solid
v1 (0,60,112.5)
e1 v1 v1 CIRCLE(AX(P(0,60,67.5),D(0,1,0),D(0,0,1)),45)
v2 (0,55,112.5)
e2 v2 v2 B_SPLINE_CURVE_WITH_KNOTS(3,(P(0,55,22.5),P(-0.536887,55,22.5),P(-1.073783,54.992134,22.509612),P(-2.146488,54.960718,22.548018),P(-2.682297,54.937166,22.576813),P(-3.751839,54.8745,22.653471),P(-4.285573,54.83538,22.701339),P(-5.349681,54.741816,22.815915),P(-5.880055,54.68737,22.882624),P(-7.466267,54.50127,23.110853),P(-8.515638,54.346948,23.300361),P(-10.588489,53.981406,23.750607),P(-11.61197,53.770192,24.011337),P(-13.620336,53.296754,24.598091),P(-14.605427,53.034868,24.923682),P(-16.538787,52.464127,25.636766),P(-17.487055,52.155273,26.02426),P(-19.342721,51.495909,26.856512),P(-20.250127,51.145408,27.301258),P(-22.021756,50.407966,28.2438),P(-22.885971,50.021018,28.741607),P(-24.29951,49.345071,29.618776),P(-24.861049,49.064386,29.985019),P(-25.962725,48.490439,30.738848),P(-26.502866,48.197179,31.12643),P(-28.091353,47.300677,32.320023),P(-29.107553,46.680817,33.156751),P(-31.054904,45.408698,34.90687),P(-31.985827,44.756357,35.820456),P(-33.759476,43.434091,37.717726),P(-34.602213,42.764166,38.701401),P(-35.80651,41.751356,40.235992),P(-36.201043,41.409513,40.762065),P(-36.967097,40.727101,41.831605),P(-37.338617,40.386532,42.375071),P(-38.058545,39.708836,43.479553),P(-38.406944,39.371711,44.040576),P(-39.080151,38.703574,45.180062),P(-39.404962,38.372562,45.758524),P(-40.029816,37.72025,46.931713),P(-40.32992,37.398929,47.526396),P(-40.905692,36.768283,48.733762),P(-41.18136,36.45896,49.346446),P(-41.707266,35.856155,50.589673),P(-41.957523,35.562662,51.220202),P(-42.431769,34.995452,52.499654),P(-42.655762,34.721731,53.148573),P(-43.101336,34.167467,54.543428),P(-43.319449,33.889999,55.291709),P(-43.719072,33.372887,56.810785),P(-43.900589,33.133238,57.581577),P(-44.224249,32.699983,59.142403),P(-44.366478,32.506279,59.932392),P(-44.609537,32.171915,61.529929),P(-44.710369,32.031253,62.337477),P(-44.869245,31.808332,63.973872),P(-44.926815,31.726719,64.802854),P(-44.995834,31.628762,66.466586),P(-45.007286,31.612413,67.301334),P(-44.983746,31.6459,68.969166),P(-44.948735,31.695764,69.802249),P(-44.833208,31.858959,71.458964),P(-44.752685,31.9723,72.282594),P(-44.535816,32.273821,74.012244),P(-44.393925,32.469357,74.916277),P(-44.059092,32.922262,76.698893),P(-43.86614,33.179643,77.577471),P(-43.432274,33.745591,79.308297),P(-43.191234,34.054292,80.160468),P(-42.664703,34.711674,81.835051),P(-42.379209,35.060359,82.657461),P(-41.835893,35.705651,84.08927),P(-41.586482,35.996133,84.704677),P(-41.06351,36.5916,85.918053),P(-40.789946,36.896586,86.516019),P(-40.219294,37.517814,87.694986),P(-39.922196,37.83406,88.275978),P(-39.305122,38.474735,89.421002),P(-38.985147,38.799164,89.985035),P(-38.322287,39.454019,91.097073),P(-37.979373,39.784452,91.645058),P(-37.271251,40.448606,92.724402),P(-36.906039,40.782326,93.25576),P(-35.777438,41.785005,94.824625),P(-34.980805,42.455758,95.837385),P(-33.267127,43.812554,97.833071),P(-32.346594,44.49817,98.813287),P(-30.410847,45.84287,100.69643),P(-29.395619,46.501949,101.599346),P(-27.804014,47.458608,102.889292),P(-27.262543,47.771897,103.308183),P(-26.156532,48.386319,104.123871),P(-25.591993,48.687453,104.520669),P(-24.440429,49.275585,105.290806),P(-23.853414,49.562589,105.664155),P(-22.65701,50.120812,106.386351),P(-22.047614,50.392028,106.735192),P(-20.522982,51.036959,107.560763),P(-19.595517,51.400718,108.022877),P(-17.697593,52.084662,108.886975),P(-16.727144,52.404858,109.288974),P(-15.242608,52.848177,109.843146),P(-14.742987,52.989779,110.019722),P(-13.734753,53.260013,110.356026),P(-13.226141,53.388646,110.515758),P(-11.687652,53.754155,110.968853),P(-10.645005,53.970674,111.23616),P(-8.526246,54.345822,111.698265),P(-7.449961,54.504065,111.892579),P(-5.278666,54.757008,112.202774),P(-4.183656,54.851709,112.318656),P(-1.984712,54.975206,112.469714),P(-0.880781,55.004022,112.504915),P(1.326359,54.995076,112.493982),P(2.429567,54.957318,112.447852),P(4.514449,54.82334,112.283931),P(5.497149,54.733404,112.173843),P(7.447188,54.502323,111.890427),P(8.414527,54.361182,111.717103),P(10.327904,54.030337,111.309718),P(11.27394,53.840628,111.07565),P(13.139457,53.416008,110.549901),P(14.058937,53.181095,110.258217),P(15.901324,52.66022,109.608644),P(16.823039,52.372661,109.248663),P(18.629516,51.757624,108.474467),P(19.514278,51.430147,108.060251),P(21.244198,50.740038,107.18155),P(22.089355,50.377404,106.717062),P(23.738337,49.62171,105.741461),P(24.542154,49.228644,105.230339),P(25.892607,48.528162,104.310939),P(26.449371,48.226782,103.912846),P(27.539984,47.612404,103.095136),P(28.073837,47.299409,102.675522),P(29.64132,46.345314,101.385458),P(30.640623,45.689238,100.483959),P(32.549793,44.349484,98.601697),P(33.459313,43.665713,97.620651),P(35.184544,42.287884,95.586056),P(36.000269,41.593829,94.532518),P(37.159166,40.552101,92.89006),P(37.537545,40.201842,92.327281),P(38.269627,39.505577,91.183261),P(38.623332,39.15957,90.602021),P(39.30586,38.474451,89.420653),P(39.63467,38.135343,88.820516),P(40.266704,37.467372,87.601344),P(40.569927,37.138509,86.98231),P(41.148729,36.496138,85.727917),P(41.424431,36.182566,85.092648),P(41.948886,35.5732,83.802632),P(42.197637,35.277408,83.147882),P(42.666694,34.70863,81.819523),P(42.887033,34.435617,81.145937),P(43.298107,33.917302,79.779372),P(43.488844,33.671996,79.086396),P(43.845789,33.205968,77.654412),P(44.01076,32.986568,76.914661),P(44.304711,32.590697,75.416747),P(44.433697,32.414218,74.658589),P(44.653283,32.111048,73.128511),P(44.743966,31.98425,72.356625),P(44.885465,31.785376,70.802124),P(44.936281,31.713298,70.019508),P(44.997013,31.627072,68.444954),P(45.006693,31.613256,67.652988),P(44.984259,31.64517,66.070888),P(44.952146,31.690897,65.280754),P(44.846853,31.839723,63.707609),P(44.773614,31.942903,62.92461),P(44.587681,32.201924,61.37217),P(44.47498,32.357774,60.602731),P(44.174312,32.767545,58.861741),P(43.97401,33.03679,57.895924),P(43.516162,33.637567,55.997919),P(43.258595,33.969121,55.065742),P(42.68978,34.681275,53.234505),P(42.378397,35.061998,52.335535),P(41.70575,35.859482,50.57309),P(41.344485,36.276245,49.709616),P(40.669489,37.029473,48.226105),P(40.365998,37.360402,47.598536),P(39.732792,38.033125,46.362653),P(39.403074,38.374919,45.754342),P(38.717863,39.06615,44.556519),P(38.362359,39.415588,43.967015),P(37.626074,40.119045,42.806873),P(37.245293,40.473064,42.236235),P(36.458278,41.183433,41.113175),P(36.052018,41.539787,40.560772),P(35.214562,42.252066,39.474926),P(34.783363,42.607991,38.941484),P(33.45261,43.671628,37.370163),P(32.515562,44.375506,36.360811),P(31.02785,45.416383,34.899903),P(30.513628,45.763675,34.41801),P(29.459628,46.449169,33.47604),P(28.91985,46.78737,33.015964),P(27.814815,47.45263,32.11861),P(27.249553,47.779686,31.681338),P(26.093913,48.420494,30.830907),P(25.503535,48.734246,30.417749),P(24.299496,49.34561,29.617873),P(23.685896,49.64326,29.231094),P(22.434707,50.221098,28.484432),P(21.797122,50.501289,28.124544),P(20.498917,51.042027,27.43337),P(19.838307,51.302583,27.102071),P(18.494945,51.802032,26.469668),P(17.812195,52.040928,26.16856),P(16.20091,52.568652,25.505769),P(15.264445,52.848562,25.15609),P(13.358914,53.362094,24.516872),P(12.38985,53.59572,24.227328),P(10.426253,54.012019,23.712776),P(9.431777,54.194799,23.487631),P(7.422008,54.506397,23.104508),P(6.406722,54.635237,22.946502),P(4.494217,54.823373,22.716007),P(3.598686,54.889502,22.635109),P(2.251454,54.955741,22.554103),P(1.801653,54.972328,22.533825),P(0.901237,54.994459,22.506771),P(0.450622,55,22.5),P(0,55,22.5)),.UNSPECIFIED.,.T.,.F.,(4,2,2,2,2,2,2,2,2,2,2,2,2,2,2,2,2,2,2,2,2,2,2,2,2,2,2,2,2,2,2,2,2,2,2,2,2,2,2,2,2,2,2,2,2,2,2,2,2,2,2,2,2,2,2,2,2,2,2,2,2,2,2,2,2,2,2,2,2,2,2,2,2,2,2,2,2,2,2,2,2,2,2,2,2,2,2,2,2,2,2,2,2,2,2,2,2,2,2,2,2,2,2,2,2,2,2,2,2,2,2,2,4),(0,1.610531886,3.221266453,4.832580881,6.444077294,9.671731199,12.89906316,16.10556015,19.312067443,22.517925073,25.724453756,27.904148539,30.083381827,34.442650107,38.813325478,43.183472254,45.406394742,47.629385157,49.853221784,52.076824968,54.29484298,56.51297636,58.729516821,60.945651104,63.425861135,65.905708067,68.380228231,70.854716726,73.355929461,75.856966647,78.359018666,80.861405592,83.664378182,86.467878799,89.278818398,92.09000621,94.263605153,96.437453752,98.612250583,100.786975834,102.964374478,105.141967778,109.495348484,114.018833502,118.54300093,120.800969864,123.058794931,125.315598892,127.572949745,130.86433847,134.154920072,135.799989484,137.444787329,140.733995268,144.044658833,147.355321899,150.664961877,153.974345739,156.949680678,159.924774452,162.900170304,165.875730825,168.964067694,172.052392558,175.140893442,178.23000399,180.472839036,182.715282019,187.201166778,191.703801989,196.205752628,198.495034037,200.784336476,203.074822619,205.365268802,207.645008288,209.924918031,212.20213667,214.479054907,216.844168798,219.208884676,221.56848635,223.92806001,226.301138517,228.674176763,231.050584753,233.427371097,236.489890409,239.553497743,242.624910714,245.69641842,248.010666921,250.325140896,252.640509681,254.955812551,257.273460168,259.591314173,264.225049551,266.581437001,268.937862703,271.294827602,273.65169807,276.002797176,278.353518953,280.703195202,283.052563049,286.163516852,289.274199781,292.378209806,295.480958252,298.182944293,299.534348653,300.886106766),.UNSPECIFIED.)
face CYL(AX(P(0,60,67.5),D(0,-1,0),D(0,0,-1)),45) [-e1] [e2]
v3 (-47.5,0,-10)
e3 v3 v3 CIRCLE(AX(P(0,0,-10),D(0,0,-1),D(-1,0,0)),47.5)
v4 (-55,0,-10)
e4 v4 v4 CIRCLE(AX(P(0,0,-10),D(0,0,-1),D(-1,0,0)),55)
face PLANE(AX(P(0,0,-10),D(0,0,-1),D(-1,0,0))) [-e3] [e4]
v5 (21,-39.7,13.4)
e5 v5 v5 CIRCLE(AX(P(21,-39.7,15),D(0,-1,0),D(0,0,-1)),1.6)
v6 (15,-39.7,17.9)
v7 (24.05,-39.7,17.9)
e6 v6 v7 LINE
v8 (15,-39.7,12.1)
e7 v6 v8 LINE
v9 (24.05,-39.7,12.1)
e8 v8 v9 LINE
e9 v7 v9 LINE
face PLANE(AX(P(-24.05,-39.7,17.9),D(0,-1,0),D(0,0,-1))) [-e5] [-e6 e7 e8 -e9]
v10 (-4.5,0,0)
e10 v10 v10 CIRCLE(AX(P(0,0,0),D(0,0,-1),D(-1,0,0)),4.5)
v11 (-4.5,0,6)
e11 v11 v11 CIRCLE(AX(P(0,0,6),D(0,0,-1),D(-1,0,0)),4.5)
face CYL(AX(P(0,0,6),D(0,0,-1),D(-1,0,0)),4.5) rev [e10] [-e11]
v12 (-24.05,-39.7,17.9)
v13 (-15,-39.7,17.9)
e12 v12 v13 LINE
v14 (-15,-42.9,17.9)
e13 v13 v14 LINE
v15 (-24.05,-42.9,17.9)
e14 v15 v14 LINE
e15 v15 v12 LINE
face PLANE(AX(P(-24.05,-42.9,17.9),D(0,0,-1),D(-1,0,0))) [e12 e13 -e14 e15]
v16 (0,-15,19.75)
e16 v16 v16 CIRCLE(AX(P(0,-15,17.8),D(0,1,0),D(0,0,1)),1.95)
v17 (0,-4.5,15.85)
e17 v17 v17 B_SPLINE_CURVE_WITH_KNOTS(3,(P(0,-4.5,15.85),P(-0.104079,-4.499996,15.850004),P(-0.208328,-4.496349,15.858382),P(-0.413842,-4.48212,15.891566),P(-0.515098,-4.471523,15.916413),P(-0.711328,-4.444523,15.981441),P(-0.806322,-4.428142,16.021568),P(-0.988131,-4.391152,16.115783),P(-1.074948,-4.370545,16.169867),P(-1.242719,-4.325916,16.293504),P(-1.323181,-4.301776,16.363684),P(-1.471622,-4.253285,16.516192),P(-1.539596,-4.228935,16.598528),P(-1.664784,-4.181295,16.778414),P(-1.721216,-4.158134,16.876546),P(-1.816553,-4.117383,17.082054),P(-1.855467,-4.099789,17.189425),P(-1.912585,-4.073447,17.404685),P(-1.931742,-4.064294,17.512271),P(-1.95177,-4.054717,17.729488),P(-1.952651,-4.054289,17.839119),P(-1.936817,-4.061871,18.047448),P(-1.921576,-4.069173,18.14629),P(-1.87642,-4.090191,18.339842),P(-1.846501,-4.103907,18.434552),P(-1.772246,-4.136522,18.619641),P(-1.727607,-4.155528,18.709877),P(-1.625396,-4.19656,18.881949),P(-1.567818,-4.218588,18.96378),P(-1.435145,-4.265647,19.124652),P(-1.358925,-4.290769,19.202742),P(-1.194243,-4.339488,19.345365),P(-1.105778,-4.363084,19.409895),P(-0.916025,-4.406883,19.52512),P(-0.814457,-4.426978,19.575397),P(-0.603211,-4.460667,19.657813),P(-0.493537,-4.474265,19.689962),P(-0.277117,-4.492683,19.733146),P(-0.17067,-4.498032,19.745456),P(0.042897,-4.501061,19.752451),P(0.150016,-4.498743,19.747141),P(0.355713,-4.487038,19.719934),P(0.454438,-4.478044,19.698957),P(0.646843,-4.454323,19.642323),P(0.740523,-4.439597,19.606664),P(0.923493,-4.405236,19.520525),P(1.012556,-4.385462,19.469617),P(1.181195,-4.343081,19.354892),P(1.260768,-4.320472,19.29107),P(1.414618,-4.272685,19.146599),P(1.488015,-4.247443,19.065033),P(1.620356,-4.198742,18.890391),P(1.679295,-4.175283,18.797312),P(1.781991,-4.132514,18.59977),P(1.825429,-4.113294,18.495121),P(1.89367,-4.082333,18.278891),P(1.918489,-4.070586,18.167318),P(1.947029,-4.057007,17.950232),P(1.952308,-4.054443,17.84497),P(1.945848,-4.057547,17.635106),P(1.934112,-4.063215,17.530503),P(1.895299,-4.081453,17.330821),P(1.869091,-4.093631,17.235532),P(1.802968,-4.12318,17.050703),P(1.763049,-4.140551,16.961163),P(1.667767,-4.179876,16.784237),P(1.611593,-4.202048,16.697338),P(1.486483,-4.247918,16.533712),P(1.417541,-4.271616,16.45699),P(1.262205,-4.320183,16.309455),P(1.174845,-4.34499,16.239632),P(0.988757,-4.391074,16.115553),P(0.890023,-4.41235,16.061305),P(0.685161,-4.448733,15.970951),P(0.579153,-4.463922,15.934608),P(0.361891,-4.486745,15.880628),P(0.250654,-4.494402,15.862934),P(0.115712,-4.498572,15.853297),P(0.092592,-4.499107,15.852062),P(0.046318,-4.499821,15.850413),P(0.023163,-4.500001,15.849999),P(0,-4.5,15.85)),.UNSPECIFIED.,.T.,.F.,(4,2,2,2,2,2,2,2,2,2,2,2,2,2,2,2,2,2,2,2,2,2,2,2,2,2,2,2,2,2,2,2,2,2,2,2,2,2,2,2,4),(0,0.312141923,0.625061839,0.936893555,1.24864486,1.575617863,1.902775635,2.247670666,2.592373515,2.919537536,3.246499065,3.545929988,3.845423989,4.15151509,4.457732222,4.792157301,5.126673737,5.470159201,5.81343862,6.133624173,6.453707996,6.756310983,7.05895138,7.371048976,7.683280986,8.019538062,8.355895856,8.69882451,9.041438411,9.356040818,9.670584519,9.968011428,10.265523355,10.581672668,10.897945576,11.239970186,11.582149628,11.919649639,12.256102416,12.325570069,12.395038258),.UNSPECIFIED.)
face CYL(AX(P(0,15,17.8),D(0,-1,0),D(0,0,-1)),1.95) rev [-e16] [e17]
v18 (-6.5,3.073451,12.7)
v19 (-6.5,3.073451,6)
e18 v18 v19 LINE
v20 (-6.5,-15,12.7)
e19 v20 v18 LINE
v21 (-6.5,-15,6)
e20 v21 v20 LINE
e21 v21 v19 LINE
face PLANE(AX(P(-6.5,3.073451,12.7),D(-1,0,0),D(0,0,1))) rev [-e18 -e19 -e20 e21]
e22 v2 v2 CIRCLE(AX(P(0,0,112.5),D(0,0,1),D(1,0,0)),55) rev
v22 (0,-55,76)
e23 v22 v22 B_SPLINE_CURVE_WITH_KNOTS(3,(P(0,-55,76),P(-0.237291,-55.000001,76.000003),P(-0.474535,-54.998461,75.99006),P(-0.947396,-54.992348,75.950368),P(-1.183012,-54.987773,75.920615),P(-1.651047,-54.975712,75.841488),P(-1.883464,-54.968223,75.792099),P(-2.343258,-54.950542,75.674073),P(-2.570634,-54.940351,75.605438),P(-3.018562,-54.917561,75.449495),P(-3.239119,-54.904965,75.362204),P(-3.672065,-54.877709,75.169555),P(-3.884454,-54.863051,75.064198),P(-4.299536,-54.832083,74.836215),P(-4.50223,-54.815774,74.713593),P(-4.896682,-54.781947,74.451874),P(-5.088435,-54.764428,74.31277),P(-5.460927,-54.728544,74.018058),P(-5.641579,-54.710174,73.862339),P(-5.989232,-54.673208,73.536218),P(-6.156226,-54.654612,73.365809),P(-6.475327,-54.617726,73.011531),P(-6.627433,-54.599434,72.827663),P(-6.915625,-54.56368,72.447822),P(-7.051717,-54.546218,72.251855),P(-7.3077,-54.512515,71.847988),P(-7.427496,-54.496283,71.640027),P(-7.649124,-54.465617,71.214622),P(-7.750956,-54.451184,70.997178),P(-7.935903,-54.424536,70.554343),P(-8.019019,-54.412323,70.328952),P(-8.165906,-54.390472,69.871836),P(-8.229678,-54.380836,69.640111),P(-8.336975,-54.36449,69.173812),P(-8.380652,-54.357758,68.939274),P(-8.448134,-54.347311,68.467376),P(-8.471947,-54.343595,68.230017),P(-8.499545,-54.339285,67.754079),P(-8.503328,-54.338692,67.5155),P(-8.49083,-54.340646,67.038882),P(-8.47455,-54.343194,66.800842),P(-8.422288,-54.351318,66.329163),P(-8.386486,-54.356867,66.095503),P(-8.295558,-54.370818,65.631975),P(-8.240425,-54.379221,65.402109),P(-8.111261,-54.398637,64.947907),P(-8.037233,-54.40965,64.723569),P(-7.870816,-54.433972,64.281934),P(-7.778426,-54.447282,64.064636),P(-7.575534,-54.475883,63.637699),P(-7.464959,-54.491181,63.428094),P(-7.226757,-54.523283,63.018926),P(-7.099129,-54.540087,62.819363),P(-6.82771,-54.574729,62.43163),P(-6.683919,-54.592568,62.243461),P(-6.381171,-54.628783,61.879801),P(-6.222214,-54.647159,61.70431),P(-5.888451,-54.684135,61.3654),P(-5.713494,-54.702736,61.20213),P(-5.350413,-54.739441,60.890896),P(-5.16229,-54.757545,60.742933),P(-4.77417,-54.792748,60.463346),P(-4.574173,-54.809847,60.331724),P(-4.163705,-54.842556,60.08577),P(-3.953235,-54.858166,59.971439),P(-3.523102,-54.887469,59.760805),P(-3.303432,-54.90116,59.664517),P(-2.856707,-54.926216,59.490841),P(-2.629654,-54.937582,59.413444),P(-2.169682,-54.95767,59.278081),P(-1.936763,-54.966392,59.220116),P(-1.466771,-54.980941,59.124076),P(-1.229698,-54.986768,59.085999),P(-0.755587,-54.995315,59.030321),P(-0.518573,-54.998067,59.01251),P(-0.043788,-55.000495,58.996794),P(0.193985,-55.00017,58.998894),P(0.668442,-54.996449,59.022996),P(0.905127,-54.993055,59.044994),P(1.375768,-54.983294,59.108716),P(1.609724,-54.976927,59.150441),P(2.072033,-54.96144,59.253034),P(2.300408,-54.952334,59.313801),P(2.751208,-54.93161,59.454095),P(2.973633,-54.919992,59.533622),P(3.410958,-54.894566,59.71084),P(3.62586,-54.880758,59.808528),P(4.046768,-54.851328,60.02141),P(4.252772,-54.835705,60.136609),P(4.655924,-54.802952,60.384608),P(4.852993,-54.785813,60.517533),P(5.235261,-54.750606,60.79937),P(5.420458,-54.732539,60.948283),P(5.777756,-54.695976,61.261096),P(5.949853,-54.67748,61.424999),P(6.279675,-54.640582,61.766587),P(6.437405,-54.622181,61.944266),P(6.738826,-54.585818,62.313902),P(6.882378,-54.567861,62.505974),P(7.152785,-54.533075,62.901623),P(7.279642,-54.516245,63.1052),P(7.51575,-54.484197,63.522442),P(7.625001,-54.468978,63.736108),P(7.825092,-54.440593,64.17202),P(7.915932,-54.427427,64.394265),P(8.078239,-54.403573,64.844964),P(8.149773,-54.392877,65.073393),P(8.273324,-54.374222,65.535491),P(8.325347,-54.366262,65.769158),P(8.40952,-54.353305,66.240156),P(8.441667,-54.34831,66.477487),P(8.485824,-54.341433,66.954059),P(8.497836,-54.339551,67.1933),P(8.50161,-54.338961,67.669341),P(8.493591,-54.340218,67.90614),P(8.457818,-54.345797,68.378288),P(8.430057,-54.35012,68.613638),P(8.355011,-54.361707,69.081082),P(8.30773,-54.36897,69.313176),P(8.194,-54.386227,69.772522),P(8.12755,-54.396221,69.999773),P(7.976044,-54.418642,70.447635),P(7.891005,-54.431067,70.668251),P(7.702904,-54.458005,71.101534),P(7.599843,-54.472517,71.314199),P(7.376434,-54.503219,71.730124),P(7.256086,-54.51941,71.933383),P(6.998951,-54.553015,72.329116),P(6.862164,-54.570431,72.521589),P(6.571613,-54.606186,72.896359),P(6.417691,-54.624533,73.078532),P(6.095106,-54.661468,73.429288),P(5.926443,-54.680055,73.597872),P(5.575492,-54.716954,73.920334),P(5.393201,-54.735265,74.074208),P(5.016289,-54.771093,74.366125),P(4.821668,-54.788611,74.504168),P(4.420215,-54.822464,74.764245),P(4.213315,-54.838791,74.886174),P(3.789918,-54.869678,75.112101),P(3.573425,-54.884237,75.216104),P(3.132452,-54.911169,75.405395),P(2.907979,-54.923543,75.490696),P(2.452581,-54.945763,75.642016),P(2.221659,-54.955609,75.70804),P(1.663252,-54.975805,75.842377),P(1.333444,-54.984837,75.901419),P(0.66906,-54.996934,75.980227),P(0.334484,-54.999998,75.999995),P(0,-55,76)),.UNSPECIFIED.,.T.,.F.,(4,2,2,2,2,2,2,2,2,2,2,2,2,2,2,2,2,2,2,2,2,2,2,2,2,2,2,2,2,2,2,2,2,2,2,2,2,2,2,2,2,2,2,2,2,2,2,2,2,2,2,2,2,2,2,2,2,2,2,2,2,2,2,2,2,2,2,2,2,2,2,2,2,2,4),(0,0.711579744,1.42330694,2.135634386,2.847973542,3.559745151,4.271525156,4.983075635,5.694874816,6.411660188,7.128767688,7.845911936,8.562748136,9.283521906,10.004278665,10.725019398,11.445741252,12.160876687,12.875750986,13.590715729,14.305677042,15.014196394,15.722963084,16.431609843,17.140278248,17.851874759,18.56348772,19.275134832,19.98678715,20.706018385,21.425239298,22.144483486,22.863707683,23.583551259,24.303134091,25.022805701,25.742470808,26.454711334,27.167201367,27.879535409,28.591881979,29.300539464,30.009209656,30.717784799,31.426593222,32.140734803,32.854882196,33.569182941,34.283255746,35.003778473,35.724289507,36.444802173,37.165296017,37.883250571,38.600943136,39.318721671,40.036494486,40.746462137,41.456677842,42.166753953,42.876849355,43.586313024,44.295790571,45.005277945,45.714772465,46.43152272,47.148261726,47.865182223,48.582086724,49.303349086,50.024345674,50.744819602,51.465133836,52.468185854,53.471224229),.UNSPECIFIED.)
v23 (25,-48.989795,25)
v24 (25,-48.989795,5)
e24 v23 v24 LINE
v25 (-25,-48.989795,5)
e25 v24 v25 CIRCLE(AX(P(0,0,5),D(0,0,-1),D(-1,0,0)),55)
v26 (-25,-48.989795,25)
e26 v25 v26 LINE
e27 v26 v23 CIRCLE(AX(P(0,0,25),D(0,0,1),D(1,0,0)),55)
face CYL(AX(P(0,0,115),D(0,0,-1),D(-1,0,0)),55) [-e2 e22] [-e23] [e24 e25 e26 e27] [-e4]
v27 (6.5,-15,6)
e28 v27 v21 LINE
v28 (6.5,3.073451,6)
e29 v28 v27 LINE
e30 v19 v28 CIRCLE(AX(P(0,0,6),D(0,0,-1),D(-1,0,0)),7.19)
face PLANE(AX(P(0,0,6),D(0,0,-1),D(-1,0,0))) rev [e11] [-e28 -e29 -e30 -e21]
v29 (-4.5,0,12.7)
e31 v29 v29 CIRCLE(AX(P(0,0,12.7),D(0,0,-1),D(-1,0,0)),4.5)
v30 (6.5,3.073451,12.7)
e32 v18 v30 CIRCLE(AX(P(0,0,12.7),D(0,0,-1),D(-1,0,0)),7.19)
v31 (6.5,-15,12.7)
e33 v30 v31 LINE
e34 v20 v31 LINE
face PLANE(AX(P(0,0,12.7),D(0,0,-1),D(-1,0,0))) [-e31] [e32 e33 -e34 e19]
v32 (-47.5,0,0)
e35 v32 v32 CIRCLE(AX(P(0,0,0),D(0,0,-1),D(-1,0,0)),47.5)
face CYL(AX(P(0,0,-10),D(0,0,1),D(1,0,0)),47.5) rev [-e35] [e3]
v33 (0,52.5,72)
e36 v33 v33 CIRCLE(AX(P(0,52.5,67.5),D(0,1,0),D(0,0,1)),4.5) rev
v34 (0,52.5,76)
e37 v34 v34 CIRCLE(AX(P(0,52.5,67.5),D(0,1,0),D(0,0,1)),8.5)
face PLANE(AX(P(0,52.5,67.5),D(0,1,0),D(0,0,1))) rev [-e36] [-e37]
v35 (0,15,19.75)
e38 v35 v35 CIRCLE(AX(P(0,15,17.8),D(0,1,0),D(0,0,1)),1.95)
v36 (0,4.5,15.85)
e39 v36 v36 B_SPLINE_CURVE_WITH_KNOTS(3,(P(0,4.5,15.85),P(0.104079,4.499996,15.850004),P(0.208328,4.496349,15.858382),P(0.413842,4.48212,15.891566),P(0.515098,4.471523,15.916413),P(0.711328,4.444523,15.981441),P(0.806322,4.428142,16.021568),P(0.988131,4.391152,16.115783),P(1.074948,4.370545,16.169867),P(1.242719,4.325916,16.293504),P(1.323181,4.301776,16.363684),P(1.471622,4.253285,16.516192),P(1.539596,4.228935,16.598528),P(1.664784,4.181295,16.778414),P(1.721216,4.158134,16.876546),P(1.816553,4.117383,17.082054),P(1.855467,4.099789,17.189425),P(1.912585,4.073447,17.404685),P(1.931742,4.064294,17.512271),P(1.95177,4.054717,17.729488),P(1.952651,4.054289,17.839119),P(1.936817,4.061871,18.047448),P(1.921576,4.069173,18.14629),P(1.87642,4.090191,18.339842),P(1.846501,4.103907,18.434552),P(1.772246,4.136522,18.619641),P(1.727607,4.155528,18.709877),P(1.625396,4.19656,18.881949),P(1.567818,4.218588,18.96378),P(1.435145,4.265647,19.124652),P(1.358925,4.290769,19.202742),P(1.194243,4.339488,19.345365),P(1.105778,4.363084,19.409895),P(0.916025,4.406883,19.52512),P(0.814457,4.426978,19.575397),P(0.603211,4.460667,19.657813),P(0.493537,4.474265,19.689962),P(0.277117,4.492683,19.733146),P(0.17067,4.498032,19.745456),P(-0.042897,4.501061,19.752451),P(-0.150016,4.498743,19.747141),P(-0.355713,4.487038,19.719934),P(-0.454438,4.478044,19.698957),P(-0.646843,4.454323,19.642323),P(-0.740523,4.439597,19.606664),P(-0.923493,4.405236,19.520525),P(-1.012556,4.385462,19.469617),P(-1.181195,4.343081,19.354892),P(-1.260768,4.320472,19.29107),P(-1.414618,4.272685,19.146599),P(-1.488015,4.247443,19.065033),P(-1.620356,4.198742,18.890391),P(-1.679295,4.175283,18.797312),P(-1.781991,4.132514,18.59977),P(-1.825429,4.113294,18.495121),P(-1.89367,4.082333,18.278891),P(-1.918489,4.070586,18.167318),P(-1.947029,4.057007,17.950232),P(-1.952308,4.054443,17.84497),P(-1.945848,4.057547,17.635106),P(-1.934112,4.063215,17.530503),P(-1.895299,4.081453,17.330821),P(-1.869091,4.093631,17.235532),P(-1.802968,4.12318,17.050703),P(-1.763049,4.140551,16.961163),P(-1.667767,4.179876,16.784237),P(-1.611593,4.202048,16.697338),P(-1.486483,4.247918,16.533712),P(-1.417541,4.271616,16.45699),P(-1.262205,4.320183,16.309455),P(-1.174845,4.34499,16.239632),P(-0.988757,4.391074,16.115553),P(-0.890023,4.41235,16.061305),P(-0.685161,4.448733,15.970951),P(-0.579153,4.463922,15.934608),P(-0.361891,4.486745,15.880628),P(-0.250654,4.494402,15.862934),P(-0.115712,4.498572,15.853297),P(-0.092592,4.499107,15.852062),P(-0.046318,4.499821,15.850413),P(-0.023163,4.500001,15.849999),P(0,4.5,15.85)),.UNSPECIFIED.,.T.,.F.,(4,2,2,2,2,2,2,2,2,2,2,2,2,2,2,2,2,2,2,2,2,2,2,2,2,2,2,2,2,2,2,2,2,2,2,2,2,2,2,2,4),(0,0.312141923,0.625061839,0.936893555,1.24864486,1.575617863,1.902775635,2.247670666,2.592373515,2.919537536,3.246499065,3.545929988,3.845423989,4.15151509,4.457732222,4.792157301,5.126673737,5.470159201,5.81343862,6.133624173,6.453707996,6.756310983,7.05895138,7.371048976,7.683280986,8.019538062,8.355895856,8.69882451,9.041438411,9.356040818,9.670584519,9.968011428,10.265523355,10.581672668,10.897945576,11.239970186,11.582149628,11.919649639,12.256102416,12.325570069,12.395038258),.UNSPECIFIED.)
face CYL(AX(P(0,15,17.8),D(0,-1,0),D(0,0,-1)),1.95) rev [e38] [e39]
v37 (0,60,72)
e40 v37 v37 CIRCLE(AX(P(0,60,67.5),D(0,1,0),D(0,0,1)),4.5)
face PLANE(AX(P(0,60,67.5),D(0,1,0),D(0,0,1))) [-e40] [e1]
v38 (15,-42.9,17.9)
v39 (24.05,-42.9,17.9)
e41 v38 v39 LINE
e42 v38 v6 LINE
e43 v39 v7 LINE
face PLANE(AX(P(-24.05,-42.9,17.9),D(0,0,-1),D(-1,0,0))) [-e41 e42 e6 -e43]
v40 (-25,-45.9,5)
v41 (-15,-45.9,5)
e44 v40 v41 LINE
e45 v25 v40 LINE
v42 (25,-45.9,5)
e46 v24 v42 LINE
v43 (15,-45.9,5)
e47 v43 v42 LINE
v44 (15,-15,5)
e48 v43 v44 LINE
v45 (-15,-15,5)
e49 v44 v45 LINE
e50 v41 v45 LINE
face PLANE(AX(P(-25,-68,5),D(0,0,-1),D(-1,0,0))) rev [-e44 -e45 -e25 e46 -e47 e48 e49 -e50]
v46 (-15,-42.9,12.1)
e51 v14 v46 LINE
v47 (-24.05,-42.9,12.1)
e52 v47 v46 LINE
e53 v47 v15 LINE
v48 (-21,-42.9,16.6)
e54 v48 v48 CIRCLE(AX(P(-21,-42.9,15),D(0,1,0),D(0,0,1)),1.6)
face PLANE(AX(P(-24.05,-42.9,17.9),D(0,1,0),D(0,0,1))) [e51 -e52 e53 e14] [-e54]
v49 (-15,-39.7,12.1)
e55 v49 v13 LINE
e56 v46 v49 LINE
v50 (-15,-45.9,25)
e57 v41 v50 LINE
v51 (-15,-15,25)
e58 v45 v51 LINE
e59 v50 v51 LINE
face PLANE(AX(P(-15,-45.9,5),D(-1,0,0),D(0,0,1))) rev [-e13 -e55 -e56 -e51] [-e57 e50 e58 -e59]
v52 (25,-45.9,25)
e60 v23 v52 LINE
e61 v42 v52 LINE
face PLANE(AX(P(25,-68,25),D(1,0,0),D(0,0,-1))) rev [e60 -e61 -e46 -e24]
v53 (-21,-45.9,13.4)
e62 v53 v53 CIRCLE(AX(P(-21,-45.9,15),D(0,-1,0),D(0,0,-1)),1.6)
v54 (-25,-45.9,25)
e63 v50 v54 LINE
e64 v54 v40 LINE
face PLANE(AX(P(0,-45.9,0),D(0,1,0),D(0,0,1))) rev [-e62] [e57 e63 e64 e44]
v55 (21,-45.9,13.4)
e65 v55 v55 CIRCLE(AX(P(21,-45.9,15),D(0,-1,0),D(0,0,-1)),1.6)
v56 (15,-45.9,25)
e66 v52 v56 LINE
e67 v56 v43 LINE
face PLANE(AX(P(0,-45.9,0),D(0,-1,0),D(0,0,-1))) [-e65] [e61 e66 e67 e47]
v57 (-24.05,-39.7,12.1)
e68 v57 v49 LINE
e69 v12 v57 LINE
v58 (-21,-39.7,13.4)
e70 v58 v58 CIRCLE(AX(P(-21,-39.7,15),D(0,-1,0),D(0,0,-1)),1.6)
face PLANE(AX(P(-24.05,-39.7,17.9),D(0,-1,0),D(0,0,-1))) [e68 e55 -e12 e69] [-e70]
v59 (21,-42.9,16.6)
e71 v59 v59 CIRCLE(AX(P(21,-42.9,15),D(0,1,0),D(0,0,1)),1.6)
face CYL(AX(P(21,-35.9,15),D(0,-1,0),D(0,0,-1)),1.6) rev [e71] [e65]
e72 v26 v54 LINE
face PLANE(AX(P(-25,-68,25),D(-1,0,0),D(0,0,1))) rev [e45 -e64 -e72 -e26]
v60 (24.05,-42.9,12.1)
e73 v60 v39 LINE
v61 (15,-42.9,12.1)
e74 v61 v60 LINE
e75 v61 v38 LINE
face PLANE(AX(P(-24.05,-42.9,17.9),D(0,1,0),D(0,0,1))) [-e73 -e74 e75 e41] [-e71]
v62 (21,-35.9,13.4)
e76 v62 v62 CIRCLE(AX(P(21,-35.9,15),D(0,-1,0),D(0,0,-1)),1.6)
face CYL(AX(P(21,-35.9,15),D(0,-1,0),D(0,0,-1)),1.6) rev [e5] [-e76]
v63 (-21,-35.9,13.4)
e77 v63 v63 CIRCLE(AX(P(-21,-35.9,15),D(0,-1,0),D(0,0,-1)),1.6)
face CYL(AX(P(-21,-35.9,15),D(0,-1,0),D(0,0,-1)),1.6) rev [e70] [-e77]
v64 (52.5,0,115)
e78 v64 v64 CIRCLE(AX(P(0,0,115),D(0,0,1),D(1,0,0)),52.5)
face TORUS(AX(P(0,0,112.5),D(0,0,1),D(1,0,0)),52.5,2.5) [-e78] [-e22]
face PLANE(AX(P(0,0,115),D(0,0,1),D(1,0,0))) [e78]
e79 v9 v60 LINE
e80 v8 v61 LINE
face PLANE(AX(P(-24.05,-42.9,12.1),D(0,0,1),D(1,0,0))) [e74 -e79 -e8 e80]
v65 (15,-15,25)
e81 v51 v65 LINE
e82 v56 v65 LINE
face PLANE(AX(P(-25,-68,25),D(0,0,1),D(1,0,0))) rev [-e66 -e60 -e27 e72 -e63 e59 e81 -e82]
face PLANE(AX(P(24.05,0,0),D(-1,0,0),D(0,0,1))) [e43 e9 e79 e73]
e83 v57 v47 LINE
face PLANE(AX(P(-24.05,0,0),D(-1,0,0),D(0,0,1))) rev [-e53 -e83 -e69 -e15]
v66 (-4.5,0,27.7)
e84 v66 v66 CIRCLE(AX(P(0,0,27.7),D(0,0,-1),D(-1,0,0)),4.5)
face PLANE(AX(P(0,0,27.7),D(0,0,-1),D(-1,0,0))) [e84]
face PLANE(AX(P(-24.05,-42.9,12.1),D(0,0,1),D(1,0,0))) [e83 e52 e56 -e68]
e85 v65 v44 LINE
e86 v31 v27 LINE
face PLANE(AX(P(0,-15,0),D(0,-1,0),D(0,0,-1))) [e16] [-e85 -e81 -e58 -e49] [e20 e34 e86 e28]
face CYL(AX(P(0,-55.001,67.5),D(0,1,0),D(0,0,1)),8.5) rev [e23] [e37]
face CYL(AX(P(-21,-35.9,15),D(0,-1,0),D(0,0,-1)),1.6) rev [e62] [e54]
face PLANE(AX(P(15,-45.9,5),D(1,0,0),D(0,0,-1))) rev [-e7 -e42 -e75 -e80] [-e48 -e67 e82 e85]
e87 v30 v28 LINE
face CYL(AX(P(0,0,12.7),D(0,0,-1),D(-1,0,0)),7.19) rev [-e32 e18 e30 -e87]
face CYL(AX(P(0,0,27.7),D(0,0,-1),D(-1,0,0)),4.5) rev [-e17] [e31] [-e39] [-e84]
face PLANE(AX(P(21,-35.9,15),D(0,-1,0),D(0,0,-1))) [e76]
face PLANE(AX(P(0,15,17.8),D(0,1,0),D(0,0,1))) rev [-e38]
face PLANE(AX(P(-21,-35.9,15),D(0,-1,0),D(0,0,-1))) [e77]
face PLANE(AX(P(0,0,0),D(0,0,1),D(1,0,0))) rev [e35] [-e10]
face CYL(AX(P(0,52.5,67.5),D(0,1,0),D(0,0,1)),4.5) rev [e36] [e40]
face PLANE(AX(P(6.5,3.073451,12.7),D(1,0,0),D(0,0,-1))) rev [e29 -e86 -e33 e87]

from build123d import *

# Parameters (mm, degrees)
ESBO_O1_R                   = 55
RESSALTO_EXTRUS_O1_DEPTH    = 115
ESBO_O2_R                   = 45
RESSALTO_EXTRUS_O2_DEPTH    = 60
ESBO_O3_R                   = 4.5
CORTE_EXTRUS_O1_DEPTH       = 6
FILETE1_R                   = 2.5
ESBO_O10_R                  = 4.5
CORTE_EXTRUS_O7_DEPTH       = 7.5
CORTE_EXTRUS_O8_REACH       = 168.752
CORTE_EXTRUS_O8_END_RADIUS  = 55
ESBO_O11_R                  = 8.5
CORTE_EXTRUS_O12_DEPTH      = 6.7
ESBO_O17_R                  = 4.5
CORTE_EXTRUS_O13_DEPTH      = 15
CORTE_EXTRUS_O14_DEPTH      = 15
CORTE_EXTRUS_O14_DEPTH_BACK = 15
ESBO_O18_R                  = 1.95
ESBO_O19_W                  = 50
ESBO_O19_H                  = 20
CORTE_EXTRUS_O15_DEPTH      = 53
CORTE_EXTRUS_O16_REACH      = 146.099
ESBO_O20_W                  = 13
ESBO_O20_H                  = 6.7
ESBO_O21_W                  = 10
ESBO_O21_H                  = 20
RESSALTO_EXTRUS_O4_DEPTH    = 30.9
CORTE_EXTRUS_O17_DEPTH      = 39.05
CORTE_EXTRUS_O17_DEPTH_BACK = 9.05
ESBO_O22_W                  = 5.8
ESBO_O22_H                  = 3.2
ESBO_O23_R                  = 1.6
CORTE_EXTRUS_O18_DEPTH      = 10
RESSALTO_EXTRUS_O5_START    = 10
ESBO_O24_R                  = 55
ESBO_O24_R_2                = 47.5
RESSALTO_EXTRUS_O5_DEPTH    = 10


with BuildPart() as part:
    # Esboço1 → Ressalto-extrusão1 (new body)
    with BuildSketch(Plane.XY):
        Circle(ESBO_O1_R)
    extrude(amount=RESSALTO_EXTRUS_O1_DEPTH)

    # Esboço2 → Ressalto-extrusão2 (add)
    with BuildSketch(Plane(origin=(0, 0, 0), x_dir=(1, 0, 0), z_dir=(0, 1, 0))):
        with Locations(Location((0, -67.5, 0), (0, 0, 90))):
            Circle(ESBO_O2_R)
    extrude(amount=RESSALTO_EXTRUS_O2_DEPTH)

    # Esboço3 → Corte-extrusão1 (cut)
    with BuildSketch(Plane(origin=(0, 0, 0), x_dir=(-1, 0, 0), z_dir=(0, 0, -1))):
        Circle(ESBO_O3_R)
    extrude(amount=-CORTE_EXTRUS_O1_DEPTH, mode=Mode.SUBTRACT)

    # Filete1
    filete1_edges = [part.edges().sort_by_distance(p)[0] for p in [
        (-55, 0, 115),
    ]]
    fillet(filete1_edges, radius=FILETE1_R - 0.0001)  # a hair under: the kernel refuses the full size

    # Esboço10 → Corte-extrusão7 (cut)
    with BuildSketch(Plane(origin=(0, 60, 0), x_dir=(1, 0, 0), z_dir=(0, 1, 0))):
        with Locations(Location((0, -67.5, 0), (0, 0, 270))):
            Circle(ESBO_O10_R)
    extrude(amount=-CORTE_EXTRUS_O7_DEPTH, mode=Mode.SUBTRACT)

    # Corte-extrusão8: up to this cylinder (the profile starts inside it)
    corte_extrus_o8_end = Plane(origin=(0, 0, 67.5), z_dir=(0, 0, -1)) * Cylinder(CORTE_EXTRUS_O8_END_RADIUS, 448.504, mode=Mode.PRIVATE)
    # Esboço11 → Corte-extrusão8 (cut, up to the surface)
    with BuildSketch(Plane(origin=(0, 52.5, 0), x_dir=(1, 0, 0), z_dir=(0, 1, 0)), mode=Mode.PRIVATE) as corte_extrus_o8_sk1:
        with Locations(Location((0, -67.5, 0), (0, 0, 270))):
            Circle(ESBO_O11_R)
    corte_extrus_o8_tool1 = extrude(corte_extrus_o8_sk1.sketch, amount=-CORTE_EXTRUS_O8_REACH, mode=Mode.PRIVATE) & corte_extrus_o8_end
    add(corte_extrus_o8_tool1.solids().sort_by_distance((0, 52.5, 67.5))[0], mode=Mode.SUBTRACT)

    # Esboço16 → Corte-extrusão12 (cut)
    with BuildSketch(Plane(origin=(0, 0, 6), x_dir=(-1, 0, 0), z_dir=(0, 0, -1))):
        with BuildLine():
            Line((-6.5, 3.073450829), (-6.5, -7.19))
            Line((-6.5, -7.19), (6.5, -7.19))
            Line((6.5, -7.19), (6.5, 3.073450829))
            ThreePointArc((6.5, 3.073450829), (0, 7.19), (-6.5, 3.073450829))
        make_face()
    extrude(amount=-CORTE_EXTRUS_O12_DEPTH, mode=Mode.SUBTRACT)

    # Esboço17 → Corte-extrusão13 (cut)
    with BuildSketch(Plane(origin=(0, 0, 12.7), x_dir=(-1, 0, 0), z_dir=(0, 0, -1))):
        Circle(ESBO_O17_R)
    extrude(amount=-CORTE_EXTRUS_O13_DEPTH, mode=Mode.SUBTRACT)

    # Esboço18 → Corte-extrusão14 (cut, two sides: drawn at the far end of the back side and taken through both)
    with BuildSketch(Plane(origin=(0, 0, 0), x_dir=(1, 0, 0), z_dir=(0, 1, 0)).offset(-CORTE_EXTRUS_O14_DEPTH_BACK)):
        with Locations(Location((0, -17.8, 0), (0, 0, 90))):
            Circle(ESBO_O18_R)
    extrude(amount=CORTE_EXTRUS_O14_DEPTH + CORTE_EXTRUS_O14_DEPTH_BACK, mode=Mode.SUBTRACT)

    # Esboço19 → Corte-extrusão15 (cut)
    with BuildSketch(Plane(origin=(0, -15, 0), x_dir=(1, 0, 0), z_dir=(0, 1, 0))):
        with Locations((0, -15)):
            Rectangle(ESBO_O19_W, ESBO_O19_H)
    extrude(amount=-CORTE_EXTRUS_O15_DEPTH, mode=Mode.SUBTRACT)

    # Esboço20 → Corte-extrusão16 (cut, up to next)
    with BuildSketch(Plane(origin=(0, -7.19, 0), x_dir=(1, 0, 0), z_dir=(0, 1, 0)), mode=Mode.PRIVATE) as corte_extrus_o16_sk1:
        with Locations((0, -9.35)):
            Rectangle(ESBO_O20_W, ESBO_O20_H)
    corte_extrus_o16_tool1 = extrude(corte_extrus_o16_sk1.sketch, amount=-CORTE_EXTRUS_O16_REACH, mode=Mode.PRIVATE) & part.part
    add(corte_extrus_o16_tool1.solids().sort_by_distance((0, -7.19, 9.35))[0], mode=Mode.SUBTRACT)

    # Esboço21 → Ressalto-extrusão4 (add)
    with BuildSketch(Plane.XZ.offset(15)):
        with Locations((20, 15)):
            Rectangle(ESBO_O21_W, ESBO_O21_H)
        with Locations((-20, 15)):
            Rectangle(ESBO_O21_W, ESBO_O21_H)
    extrude(amount=RESSALTO_EXTRUS_O4_DEPTH)

    # Esboço22 → Corte-extrusão17 (cut, two sides: drawn at the far end of the back side and taken through both)
    with BuildSketch(Plane.ZY.offset(-15).offset(-CORTE_EXTRUS_O17_DEPTH_BACK)):
        with Locations((15, -41.3)):
            Rectangle(ESBO_O22_W, ESBO_O22_H)
    extrude(amount=CORTE_EXTRUS_O17_DEPTH + CORTE_EXTRUS_O17_DEPTH_BACK, mode=Mode.SUBTRACT)

    # Esboço23 → Corte-extrusão18 (cut)
    with BuildSketch(Plane.XZ.offset(45.9)):
        with Locations(Location((21, 15, 0), (0, 0, 270))):
            Circle(ESBO_O23_R)
        with Locations(Location((-21, 15, 0), (0, 0, 270))):
            Circle(ESBO_O23_R)
    extrude(amount=-CORTE_EXTRUS_O18_DEPTH, mode=Mode.SUBTRACT)

    # Esboço24 → Ressalto-extrusão5 (add)
    with BuildSketch(Plane(origin=(0, 0, 0), x_dir=(-1, 0, 0), z_dir=(0, 0, -1)).offset(RESSALTO_EXTRUS_O5_START)):
        Circle(ESBO_O24_R)
        Circle(ESBO_O24_R_2, mode=Mode.SUBTRACT)
    extrude(amount=-RESSALTO_EXTRUS_O5_DEPTH)


solid = part.part
